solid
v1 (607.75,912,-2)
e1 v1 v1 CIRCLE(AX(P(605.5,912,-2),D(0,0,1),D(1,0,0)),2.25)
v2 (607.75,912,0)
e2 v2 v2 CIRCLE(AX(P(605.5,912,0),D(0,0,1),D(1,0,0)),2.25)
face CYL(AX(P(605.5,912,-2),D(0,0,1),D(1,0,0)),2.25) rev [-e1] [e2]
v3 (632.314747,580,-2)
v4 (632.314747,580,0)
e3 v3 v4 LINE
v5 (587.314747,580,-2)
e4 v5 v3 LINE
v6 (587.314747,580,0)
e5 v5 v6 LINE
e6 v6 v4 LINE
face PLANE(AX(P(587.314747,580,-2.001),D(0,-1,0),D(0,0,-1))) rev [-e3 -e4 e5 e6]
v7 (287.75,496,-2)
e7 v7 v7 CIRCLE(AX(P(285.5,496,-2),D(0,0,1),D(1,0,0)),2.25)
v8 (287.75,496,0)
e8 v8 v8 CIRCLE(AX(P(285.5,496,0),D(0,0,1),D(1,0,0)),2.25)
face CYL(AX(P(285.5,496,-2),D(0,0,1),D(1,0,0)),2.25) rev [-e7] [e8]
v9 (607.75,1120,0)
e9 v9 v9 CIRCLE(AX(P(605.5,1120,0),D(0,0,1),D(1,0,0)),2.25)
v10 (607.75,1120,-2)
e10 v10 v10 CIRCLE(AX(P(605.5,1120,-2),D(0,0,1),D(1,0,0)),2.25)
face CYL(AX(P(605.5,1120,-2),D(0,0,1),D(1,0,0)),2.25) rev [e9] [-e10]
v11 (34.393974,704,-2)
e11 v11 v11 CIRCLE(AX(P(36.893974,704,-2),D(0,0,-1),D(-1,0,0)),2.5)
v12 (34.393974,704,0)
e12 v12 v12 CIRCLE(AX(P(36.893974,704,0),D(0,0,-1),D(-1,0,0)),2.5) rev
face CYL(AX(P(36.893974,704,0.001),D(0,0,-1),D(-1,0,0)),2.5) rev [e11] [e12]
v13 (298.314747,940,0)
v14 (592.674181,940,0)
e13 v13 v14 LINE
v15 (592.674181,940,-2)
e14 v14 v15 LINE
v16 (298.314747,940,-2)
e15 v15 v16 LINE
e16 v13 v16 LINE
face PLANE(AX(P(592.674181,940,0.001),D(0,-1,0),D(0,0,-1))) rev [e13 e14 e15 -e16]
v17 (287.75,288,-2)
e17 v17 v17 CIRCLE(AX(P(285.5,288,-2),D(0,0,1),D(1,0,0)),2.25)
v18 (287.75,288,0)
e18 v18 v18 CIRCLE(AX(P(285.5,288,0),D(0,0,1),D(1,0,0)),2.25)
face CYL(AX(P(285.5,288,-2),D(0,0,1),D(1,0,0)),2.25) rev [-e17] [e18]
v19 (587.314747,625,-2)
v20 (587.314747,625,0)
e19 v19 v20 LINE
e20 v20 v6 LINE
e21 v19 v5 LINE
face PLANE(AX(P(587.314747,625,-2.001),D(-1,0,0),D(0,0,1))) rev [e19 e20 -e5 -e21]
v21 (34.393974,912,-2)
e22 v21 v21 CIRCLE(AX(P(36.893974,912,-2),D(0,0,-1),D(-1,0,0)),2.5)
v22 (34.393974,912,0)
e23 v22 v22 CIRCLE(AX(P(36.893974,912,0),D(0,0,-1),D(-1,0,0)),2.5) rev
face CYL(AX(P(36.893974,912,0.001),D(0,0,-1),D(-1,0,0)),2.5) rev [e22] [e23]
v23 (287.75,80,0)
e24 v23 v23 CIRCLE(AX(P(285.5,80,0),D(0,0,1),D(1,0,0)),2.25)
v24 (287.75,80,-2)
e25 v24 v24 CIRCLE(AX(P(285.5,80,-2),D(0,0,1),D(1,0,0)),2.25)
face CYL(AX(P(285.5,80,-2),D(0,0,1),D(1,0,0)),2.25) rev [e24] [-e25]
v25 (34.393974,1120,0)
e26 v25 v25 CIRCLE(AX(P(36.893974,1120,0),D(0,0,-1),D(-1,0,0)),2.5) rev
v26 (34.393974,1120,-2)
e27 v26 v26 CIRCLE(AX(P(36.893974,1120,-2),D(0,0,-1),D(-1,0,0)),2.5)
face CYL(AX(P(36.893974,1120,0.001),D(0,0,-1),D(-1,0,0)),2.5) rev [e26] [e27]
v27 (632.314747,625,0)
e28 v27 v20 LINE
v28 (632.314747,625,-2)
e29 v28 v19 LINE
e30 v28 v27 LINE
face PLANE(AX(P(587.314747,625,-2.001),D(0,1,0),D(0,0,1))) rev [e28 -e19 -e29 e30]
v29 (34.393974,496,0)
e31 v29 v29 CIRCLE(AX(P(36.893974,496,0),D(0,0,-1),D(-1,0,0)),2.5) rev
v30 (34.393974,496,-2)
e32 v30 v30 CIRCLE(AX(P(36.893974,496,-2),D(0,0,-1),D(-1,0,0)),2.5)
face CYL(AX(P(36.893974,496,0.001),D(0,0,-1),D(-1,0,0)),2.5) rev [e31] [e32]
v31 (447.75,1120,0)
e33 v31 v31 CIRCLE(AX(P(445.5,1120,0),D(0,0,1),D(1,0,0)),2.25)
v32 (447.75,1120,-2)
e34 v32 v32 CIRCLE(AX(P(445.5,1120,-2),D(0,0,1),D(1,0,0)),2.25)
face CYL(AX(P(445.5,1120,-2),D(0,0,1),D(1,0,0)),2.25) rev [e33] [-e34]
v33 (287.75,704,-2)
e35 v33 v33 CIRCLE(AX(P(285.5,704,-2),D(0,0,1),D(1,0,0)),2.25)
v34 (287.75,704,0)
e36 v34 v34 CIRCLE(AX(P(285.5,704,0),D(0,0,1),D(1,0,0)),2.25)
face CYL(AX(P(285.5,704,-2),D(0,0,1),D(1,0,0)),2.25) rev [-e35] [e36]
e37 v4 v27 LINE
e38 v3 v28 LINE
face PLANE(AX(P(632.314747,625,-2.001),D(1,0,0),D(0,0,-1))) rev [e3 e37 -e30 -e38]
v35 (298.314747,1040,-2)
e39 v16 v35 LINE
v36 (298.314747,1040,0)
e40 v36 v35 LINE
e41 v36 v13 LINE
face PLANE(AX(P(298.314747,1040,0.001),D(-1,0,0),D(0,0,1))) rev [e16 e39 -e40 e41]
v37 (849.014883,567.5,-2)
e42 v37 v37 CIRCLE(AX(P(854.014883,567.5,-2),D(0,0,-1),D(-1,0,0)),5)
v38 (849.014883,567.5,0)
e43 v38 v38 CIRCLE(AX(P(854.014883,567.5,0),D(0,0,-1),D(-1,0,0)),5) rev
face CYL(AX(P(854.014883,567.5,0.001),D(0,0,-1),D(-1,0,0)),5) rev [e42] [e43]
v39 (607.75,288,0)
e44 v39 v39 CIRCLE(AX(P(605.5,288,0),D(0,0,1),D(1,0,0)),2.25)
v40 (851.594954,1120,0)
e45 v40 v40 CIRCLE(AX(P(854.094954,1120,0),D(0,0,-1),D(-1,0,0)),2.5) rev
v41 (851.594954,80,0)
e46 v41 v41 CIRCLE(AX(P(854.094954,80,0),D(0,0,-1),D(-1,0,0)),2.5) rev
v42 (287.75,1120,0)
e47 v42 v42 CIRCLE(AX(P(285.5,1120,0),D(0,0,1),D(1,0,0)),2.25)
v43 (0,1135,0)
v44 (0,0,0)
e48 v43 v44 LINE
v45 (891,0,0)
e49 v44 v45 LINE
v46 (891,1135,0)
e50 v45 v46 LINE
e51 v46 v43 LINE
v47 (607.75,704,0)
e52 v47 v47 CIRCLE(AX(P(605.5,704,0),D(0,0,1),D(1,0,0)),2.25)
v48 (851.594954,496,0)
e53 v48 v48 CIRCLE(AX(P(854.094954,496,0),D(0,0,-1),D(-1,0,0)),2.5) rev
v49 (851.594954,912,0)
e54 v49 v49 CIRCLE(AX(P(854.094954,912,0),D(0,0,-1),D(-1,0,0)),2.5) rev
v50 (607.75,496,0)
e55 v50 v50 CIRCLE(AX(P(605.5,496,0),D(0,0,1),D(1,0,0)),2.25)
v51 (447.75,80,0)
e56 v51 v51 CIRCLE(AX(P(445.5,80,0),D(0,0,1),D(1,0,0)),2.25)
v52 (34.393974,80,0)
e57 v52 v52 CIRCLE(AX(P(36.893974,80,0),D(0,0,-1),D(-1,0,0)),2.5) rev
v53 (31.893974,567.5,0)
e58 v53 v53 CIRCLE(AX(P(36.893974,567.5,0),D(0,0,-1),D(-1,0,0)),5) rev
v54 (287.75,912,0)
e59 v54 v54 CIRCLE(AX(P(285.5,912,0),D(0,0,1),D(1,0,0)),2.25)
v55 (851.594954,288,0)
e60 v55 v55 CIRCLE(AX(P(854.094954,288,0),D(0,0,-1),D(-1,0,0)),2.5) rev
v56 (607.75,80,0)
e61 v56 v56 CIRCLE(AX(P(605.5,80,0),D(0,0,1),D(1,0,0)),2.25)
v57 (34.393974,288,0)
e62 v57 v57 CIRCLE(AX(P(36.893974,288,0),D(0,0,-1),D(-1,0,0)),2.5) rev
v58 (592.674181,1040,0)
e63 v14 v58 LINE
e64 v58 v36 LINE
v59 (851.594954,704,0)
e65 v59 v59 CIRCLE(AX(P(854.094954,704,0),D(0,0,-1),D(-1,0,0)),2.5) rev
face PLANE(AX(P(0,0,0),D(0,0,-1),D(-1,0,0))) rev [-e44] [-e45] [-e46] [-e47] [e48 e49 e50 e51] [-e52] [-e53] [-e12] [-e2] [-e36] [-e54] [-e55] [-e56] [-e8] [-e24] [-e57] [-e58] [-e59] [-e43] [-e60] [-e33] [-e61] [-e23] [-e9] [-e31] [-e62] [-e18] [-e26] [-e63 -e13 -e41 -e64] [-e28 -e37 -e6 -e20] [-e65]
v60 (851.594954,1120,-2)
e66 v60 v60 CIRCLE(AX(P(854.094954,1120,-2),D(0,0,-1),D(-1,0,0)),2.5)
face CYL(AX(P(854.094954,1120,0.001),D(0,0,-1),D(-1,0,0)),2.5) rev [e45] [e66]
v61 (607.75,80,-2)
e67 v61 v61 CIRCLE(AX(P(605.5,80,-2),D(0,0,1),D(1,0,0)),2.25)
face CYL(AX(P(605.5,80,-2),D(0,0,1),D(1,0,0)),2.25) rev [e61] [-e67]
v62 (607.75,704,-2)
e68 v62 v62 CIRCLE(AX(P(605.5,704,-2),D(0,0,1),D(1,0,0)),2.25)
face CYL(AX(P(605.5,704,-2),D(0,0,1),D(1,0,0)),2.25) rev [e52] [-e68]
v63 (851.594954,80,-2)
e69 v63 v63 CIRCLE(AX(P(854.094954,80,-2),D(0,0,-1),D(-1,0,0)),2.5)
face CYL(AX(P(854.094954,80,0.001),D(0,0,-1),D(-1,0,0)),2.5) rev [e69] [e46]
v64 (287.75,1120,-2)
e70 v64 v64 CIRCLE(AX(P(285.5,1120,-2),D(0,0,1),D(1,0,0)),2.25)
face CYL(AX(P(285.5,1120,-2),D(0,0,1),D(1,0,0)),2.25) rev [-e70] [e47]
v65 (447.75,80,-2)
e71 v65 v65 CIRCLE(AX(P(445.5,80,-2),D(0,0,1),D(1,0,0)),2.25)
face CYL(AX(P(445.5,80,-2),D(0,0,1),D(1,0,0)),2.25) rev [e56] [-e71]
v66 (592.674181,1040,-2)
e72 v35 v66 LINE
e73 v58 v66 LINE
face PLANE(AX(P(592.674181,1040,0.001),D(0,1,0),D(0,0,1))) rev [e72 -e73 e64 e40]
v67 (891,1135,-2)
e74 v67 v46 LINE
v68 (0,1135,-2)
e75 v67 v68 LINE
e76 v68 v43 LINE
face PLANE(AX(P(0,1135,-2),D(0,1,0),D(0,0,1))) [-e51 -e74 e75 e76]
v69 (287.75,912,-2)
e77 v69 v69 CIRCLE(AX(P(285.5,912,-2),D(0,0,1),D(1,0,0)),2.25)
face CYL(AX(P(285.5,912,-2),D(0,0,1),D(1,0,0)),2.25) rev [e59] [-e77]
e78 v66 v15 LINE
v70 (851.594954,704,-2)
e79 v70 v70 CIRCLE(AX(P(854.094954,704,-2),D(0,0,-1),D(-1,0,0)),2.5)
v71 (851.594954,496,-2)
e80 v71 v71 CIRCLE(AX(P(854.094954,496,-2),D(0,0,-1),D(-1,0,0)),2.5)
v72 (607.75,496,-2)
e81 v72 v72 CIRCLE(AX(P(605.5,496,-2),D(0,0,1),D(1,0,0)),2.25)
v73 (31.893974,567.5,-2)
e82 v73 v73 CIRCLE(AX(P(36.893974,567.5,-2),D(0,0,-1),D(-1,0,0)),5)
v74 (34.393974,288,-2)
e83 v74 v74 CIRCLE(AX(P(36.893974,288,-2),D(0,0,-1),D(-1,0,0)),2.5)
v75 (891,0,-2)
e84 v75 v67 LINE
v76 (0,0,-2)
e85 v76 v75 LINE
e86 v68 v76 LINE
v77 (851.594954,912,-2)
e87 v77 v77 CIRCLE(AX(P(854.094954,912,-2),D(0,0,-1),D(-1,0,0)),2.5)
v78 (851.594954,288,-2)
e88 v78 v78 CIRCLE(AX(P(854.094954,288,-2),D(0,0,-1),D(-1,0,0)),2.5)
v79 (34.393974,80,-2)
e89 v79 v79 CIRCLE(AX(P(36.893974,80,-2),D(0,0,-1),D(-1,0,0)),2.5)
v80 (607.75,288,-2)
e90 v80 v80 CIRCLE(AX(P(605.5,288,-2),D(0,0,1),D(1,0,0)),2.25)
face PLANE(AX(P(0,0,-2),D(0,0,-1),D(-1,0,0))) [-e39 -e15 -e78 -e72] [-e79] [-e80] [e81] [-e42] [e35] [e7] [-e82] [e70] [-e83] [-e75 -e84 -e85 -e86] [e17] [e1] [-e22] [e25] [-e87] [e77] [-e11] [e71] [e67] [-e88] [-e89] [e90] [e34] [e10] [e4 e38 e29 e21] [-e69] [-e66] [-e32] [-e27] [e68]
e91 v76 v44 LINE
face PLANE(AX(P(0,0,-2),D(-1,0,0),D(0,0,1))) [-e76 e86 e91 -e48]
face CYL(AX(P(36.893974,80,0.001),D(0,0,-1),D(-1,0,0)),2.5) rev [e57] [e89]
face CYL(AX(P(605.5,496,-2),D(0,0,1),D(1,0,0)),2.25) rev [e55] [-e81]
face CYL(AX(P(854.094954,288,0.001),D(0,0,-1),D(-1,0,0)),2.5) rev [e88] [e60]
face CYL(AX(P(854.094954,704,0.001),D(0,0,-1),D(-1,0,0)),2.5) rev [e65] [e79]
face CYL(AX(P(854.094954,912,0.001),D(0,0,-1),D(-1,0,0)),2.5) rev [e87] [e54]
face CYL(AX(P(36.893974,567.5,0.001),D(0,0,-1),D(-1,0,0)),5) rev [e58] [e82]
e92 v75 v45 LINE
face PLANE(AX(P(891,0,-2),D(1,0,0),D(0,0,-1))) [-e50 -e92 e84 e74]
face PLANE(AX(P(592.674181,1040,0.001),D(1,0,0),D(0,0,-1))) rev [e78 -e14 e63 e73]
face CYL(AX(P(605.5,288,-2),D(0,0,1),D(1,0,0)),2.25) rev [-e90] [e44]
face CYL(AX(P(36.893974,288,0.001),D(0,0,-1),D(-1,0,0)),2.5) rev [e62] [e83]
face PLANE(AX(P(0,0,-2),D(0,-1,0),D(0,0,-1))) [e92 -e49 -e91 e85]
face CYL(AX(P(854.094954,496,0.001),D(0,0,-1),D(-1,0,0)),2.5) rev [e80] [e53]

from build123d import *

# Parameters (mm, degrees)
SKETCH_1_W             = 891
SKETCH_1_H             = 1135
SKETCH_1_R             = 2.25
SM_BASE_FLANGE_1_DEPTH = 2
CUT_EXTRUDE_1_REACH    = 1444.952
SKETCH_7_W             = 294.359434409
SKETCH_7_H             = 100
CUT_EXTRUDE_2_REACH    = 1444.952
SKETCH_8_R             = 5
CUT_EXTRUDE_3_REACH    = 1444.952
SKETCH_9_W             = 45
SKETCH_9_H             = 45
CUT_EXTRUDE_4_REACH    = 1444.952
SKETCH_10_R            = 2.5


# Sheet-metal steps are written as plain solids
with BuildPart() as part:
    # Sketch 1 → Базовая кромка1 (new body)
    with BuildSketch(Plane.XY):
        with Locations((445.5, 567.5)):
            Rectangle(SKETCH_1_W, SKETCH_1_H)
        with Locations((285.5, 912)):
            Circle(SKETCH_1_R, mode=Mode.SUBTRACT)
        with Locations((285.5, 704)):
            Circle(SKETCH_1_R, mode=Mode.SUBTRACT)
        with Locations((285.5, 496)):
            Circle(SKETCH_1_R, mode=Mode.SUBTRACT)
        with Locations((285.5, 288)):
            Circle(SKETCH_1_R, mode=Mode.SUBTRACT)
        with Locations((285.5, 80)):
            Circle(SKETCH_1_R, mode=Mode.SUBTRACT)
        with Locations((445.5, 80)):
            Circle(SKETCH_1_R, mode=Mode.SUBTRACT)
        with Locations((605.5, 80)):
            Circle(SKETCH_1_R, mode=Mode.SUBTRACT)
        with Locations((605.5, 288)):
            Circle(SKETCH_1_R, mode=Mode.SUBTRACT)
        with Locations((605.5, 496)):
            Circle(SKETCH_1_R, mode=Mode.SUBTRACT)
        with Locations((605.5, 704)):
            Circle(SKETCH_1_R, mode=Mode.SUBTRACT)
        with Locations((605.5, 912)):
            Circle(SKETCH_1_R, mode=Mode.SUBTRACT)
        with Locations((605.5, 1120)):
            Circle(SKETCH_1_R, mode=Mode.SUBTRACT)
        with Locations((445.5, 1120)):
            Circle(SKETCH_1_R, mode=Mode.SUBTRACT)
        with Locations((285.5, 1120)):
            Circle(SKETCH_1_R, mode=Mode.SUBTRACT)
    extrude(amount=-SM_BASE_FLANGE_1_DEPTH)

    # Эскиз7 → Вырез-Вытянуть1 (cut, up to next)
    with BuildSketch(Plane(origin=(0, 0, -2), x_dir=(-1, 0, 0), z_dir=(0, 0, -1)), mode=Mode.PRIVATE) as cut_extrude_1_sk1:
        with Locations((-445.494464103, 990)):
            Rectangle(SKETCH_7_W, SKETCH_7_H)
    cut_extrude_1_tool1 = extrude(cut_extrude_1_sk1.sketch, amount=-CUT_EXTRUDE_1_REACH, mode=Mode.PRIVATE) & part.part
    add(cut_extrude_1_tool1.solids().sort_by_distance((445.494464, 990, -2))[0], mode=Mode.SUBTRACT)

    # Эскиз8 → Вырез-Вытянуть2 (cut, up to next)
    with BuildSketch(Plane(origin=(0, 0, -2), x_dir=(-1, 0, 0), z_dir=(0, 0, -1)), mode=Mode.PRIVATE) as cut_extrude_2_sk1:
        with Locations((-36.893974432, 567.5)):
            Circle(SKETCH_8_R)
    cut_extrude_2_tool1 = extrude(cut_extrude_2_sk1.sketch, amount=-CUT_EXTRUDE_2_REACH, mode=Mode.PRIVATE) & part.part
    # Эскиз8 → Вырез-Вытянуть2 (cut, up to next)
    with BuildSketch(Plane(origin=(0, 0, -2), x_dir=(-1, 0, 0), z_dir=(0, 0, -1)), mode=Mode.PRIVATE) as cut_extrude_2_sk2:
        with Locations((-854.014883074, 567.5)):
            Circle(SKETCH_8_R)
    cut_extrude_2_tool2 = extrude(cut_extrude_2_sk2.sketch, amount=-CUT_EXTRUDE_2_REACH, mode=Mode.PRIVATE) & part.part
    add(cut_extrude_2_tool1.solids().sort_by_distance((36.893974, 567.5, -2))[0], mode=Mode.SUBTRACT)
    add(cut_extrude_2_tool2.solids().sort_by_distance((854.014883, 567.5, -2))[0], mode=Mode.SUBTRACT)

    # Эскиз9 → Вырез-Вытянуть3 (cut, up to next)
    with BuildSketch(Plane.XY, mode=Mode.PRIVATE) as cut_extrude_3_sk1:
        with Locations((609.814746898, 602.5)):
            Rectangle(SKETCH_9_W, SKETCH_9_H)
    cut_extrude_3_tool1 = extrude(cut_extrude_3_sk1.sketch, amount=-CUT_EXTRUDE_3_REACH, mode=Mode.PRIVATE) & part.part
    add(cut_extrude_3_tool1.solids().sort_by_distance((609.814747, 602.5, 0))[0], mode=Mode.SUBTRACT)

    # Эскиз10 → Вырез-Вытянуть4 (cut, up to next)
    with BuildSketch(Plane(origin=(0, 0, -2), x_dir=(-1, 0, 0), z_dir=(0, 0, -1)), mode=Mode.PRIVATE) as cut_extrude_4_sk1:
        with Locations((-854.094953773, 1120)):
            Circle(SKETCH_10_R)
    cut_extrude_4_tool1 = extrude(cut_extrude_4_sk1.sketch, amount=-CUT_EXTRUDE_4_REACH, mode=Mode.PRIVATE) & part.part
    # Эскиз10 → Вырез-Вытянуть4 (cut, up to next)
    with BuildSketch(Plane(origin=(0, 0, -2), x_dir=(-1, 0, 0), z_dir=(0, 0, -1)), mode=Mode.PRIVATE) as cut_extrude_4_sk2:
        with Locations((-854.094953773, 912)):
            Circle(SKETCH_10_R)
    cut_extrude_4_tool2 = extrude(cut_extrude_4_sk2.sketch, amount=-CUT_EXTRUDE_4_REACH, mode=Mode.PRIVATE) & part.part
    # Эскиз10 → Вырез-Вытянуть4 (cut, up to next)
    with BuildSketch(Plane(origin=(0, 0, -2), x_dir=(-1, 0, 0), z_dir=(0, 0, -1)), mode=Mode.PRIVATE) as cut_extrude_4_sk3:
        with Locations((-854.094953773, 704)):
            Circle(SKETCH_10_R)
    cut_extrude_4_tool3 = extrude(cut_extrude_4_sk3.sketch, amount=-CUT_EXTRUDE_4_REACH, mode=Mode.PRIVATE) & part.part
    # Эскиз10 → Вырез-Вытянуть4 (cut, up to next)
    with BuildSketch(Plane(origin=(0, 0, -2), x_dir=(-1, 0, 0), z_dir=(0, 0, -1)), mode=Mode.PRIVATE) as cut_extrude_4_sk4:
        with Locations((-854.094953773, 496)):
            Circle(SKETCH_10_R)
    cut_extrude_4_tool4 = extrude(cut_extrude_4_sk4.sketch, amount=-CUT_EXTRUDE_4_REACH, mode=Mode.PRIVATE) & part.part
    # Эскиз10 → Вырез-Вытянуть4 (cut, up to next)
    with BuildSketch(Plane(origin=(0, 0, -2), x_dir=(-1, 0, 0), z_dir=(0, 0, -1)), mode=Mode.PRIVATE) as cut_extrude_4_sk5:
        with Locations((-854.094953773, 288)):
            Circle(SKETCH_10_R)
    cut_extrude_4_tool5 = extrude(cut_extrude_4_sk5.sketch, amount=-CUT_EXTRUDE_4_REACH, mode=Mode.PRIVATE) & part.part
    # Эскиз10 → Вырез-Вытянуть4 (cut, up to next)
    with BuildSketch(Plane(origin=(0, 0, -2), x_dir=(-1, 0, 0), z_dir=(0, 0, -1)), mode=Mode.PRIVATE) as cut_extrude_4_sk6:
        with Locations((-854.094953773, 80)):
            Circle(SKETCH_10_R)
    cut_extrude_4_tool6 = extrude(cut_extrude_4_sk6.sketch, amount=-CUT_EXTRUDE_4_REACH, mode=Mode.PRIVATE) & part.part
    # Эскиз10 → Вырез-Вытянуть4 (cut, up to next)
    with BuildSketch(Plane(origin=(0, 0, -2), x_dir=(-1, 0, 0), z_dir=(0, 0, -1)), mode=Mode.PRIVATE) as cut_extrude_4_sk7:
        with Locations((-36.893974432, 1120)):
            Circle(SKETCH_10_R)
    cut_extrude_4_tool7 = extrude(cut_extrude_4_sk7.sketch, amount=-CUT_EXTRUDE_4_REACH, mode=Mode.PRIVATE) & part.part
    # Эскиз10 → Вырез-Вытянуть4 (cut, up to next)
    with BuildSketch(Plane(origin=(0, 0, -2), x_dir=(-1, 0, 0), z_dir=(0, 0, -1)), mode=Mode.PRIVATE) as cut_extrude_4_sk8:
        with Locations((-36.893974432, 912)):
            Circle(SKETCH_10_R)
    cut_extrude_4_tool8 = extrude(cut_extrude_4_sk8.sketch, amount=-CUT_EXTRUDE_4_REACH, mode=Mode.PRIVATE) & part.part
    # Эскиз10 → Вырез-Вытянуть4 (cut, up to next)
    with BuildSketch(Plane(origin=(0, 0, -2), x_dir=(-1, 0, 0), z_dir=(0, 0, -1)), mode=Mode.PRIVATE) as cut_extrude_4_sk9:
        with Locations((-36.893974432, 704)):
            Circle(SKETCH_10_R)
    cut_extrude_4_tool9 = extrude(cut_extrude_4_sk9.sketch, amount=-CUT_EXTRUDE_4_REACH, mode=Mode.PRIVATE) & part.part
    # Эскиз10 → Вырез-Вытянуть4 (cut, up to next)
    with BuildSketch(Plane(origin=(0, 0, -2), x_dir=(-1, 0, 0), z_dir=(0, 0, -1)), mode=Mode.PRIVATE) as cut_extrude_4_sk10:
        with Locations((-36.893974432, 496)):
            Circle(SKETCH_10_R)
    cut_extrude_4_tool10 = extrude(cut_extrude_4_sk10.sketch, amount=-CUT_EXTRUDE_4_REACH, mode=Mode.PRIVATE) & part.part
    # Эскиз10 → Вырез-Вытянуть4 (cut, up to next)
    with BuildSketch(Plane(origin=(0, 0, -2), x_dir=(-1, 0, 0), z_dir=(0, 0, -1)), mode=Mode.PRIVATE) as cut_extrude_4_sk11:
        with Locations((-36.893974432, 288)):
            Circle(SKETCH_10_R)
    cut_extrude_4_tool11 = extrude(cut_extrude_4_sk11.sketch, amount=-CUT_EXTRUDE_4_REACH, mode=Mode.PRIVATE) & part.part
    # Эскиз10 → Вырез-Вытянуть4 (cut, up to next)
    with BuildSketch(Plane(origin=(0, 0, -2), x_dir=(-1, 0, 0), z_dir=(0, 0, -1)), mode=Mode.PRIVATE) as cut_extrude_4_sk12:
        with Locations((-36.893974432, 80)):
            Circle(SKETCH_10_R)
    cut_extrude_4_tool12 = extrude(cut_extrude_4_sk12.sketch, amount=-CUT_EXTRUDE_4_REACH, mode=Mode.PRIVATE) & part.part
    add(cut_extrude_4_tool1.solids().sort_by_distance((854.094954, 1120, -2))[0], mode=Mode.SUBTRACT)
    add(cut_extrude_4_tool2.solids().sort_by_distance((854.094954, 912, -2))[0], mode=Mode.SUBTRACT)
    add(cut_extrude_4_tool3.solids().sort_by_distance((854.094954, 704, -2))[0], mode=Mode.SUBTRACT)
    add(cut_extrude_4_tool4.solids().sort_by_distance((854.094954, 496, -2))[0], mode=Mode.SUBTRACT)
    add(cut_extrude_4_tool5.solids().sort_by_distance((854.094954, 288, -2))[0], mode=Mode.SUBTRACT)
    add(cut_extrude_4_tool6.solids().sort_by_distance((854.094954, 80, -2))[0], mode=Mode.SUBTRACT)
    add(cut_extrude_4_tool7.solids().sort_by_distance((36.893974, 1120, -2))[0], mode=Mode.SUBTRACT)
    add(cut_extrude_4_tool8.solids().sort_by_distance((36.893974, 912, -2))[0], mode=Mode.SUBTRACT)
    add(cut_extrude_4_tool9.solids().sort_by_distance((36.893974, 704, -2))[0], mode=Mode.SUBTRACT)
    add(cut_extrude_4_tool10.solids().sort_by_distance((36.893974, 496, -2))[0], mode=Mode.SUBTRACT)
    add(cut_extrude_4_tool11.solids().sort_by_distance((36.893974, 288, -2))[0], mode=Mode.SUBTRACT)
    add(cut_extrude_4_tool12.solids().sort_by_distance((36.893974, 80, -2))[0], mode=Mode.SUBTRACT)


solid = part.part
